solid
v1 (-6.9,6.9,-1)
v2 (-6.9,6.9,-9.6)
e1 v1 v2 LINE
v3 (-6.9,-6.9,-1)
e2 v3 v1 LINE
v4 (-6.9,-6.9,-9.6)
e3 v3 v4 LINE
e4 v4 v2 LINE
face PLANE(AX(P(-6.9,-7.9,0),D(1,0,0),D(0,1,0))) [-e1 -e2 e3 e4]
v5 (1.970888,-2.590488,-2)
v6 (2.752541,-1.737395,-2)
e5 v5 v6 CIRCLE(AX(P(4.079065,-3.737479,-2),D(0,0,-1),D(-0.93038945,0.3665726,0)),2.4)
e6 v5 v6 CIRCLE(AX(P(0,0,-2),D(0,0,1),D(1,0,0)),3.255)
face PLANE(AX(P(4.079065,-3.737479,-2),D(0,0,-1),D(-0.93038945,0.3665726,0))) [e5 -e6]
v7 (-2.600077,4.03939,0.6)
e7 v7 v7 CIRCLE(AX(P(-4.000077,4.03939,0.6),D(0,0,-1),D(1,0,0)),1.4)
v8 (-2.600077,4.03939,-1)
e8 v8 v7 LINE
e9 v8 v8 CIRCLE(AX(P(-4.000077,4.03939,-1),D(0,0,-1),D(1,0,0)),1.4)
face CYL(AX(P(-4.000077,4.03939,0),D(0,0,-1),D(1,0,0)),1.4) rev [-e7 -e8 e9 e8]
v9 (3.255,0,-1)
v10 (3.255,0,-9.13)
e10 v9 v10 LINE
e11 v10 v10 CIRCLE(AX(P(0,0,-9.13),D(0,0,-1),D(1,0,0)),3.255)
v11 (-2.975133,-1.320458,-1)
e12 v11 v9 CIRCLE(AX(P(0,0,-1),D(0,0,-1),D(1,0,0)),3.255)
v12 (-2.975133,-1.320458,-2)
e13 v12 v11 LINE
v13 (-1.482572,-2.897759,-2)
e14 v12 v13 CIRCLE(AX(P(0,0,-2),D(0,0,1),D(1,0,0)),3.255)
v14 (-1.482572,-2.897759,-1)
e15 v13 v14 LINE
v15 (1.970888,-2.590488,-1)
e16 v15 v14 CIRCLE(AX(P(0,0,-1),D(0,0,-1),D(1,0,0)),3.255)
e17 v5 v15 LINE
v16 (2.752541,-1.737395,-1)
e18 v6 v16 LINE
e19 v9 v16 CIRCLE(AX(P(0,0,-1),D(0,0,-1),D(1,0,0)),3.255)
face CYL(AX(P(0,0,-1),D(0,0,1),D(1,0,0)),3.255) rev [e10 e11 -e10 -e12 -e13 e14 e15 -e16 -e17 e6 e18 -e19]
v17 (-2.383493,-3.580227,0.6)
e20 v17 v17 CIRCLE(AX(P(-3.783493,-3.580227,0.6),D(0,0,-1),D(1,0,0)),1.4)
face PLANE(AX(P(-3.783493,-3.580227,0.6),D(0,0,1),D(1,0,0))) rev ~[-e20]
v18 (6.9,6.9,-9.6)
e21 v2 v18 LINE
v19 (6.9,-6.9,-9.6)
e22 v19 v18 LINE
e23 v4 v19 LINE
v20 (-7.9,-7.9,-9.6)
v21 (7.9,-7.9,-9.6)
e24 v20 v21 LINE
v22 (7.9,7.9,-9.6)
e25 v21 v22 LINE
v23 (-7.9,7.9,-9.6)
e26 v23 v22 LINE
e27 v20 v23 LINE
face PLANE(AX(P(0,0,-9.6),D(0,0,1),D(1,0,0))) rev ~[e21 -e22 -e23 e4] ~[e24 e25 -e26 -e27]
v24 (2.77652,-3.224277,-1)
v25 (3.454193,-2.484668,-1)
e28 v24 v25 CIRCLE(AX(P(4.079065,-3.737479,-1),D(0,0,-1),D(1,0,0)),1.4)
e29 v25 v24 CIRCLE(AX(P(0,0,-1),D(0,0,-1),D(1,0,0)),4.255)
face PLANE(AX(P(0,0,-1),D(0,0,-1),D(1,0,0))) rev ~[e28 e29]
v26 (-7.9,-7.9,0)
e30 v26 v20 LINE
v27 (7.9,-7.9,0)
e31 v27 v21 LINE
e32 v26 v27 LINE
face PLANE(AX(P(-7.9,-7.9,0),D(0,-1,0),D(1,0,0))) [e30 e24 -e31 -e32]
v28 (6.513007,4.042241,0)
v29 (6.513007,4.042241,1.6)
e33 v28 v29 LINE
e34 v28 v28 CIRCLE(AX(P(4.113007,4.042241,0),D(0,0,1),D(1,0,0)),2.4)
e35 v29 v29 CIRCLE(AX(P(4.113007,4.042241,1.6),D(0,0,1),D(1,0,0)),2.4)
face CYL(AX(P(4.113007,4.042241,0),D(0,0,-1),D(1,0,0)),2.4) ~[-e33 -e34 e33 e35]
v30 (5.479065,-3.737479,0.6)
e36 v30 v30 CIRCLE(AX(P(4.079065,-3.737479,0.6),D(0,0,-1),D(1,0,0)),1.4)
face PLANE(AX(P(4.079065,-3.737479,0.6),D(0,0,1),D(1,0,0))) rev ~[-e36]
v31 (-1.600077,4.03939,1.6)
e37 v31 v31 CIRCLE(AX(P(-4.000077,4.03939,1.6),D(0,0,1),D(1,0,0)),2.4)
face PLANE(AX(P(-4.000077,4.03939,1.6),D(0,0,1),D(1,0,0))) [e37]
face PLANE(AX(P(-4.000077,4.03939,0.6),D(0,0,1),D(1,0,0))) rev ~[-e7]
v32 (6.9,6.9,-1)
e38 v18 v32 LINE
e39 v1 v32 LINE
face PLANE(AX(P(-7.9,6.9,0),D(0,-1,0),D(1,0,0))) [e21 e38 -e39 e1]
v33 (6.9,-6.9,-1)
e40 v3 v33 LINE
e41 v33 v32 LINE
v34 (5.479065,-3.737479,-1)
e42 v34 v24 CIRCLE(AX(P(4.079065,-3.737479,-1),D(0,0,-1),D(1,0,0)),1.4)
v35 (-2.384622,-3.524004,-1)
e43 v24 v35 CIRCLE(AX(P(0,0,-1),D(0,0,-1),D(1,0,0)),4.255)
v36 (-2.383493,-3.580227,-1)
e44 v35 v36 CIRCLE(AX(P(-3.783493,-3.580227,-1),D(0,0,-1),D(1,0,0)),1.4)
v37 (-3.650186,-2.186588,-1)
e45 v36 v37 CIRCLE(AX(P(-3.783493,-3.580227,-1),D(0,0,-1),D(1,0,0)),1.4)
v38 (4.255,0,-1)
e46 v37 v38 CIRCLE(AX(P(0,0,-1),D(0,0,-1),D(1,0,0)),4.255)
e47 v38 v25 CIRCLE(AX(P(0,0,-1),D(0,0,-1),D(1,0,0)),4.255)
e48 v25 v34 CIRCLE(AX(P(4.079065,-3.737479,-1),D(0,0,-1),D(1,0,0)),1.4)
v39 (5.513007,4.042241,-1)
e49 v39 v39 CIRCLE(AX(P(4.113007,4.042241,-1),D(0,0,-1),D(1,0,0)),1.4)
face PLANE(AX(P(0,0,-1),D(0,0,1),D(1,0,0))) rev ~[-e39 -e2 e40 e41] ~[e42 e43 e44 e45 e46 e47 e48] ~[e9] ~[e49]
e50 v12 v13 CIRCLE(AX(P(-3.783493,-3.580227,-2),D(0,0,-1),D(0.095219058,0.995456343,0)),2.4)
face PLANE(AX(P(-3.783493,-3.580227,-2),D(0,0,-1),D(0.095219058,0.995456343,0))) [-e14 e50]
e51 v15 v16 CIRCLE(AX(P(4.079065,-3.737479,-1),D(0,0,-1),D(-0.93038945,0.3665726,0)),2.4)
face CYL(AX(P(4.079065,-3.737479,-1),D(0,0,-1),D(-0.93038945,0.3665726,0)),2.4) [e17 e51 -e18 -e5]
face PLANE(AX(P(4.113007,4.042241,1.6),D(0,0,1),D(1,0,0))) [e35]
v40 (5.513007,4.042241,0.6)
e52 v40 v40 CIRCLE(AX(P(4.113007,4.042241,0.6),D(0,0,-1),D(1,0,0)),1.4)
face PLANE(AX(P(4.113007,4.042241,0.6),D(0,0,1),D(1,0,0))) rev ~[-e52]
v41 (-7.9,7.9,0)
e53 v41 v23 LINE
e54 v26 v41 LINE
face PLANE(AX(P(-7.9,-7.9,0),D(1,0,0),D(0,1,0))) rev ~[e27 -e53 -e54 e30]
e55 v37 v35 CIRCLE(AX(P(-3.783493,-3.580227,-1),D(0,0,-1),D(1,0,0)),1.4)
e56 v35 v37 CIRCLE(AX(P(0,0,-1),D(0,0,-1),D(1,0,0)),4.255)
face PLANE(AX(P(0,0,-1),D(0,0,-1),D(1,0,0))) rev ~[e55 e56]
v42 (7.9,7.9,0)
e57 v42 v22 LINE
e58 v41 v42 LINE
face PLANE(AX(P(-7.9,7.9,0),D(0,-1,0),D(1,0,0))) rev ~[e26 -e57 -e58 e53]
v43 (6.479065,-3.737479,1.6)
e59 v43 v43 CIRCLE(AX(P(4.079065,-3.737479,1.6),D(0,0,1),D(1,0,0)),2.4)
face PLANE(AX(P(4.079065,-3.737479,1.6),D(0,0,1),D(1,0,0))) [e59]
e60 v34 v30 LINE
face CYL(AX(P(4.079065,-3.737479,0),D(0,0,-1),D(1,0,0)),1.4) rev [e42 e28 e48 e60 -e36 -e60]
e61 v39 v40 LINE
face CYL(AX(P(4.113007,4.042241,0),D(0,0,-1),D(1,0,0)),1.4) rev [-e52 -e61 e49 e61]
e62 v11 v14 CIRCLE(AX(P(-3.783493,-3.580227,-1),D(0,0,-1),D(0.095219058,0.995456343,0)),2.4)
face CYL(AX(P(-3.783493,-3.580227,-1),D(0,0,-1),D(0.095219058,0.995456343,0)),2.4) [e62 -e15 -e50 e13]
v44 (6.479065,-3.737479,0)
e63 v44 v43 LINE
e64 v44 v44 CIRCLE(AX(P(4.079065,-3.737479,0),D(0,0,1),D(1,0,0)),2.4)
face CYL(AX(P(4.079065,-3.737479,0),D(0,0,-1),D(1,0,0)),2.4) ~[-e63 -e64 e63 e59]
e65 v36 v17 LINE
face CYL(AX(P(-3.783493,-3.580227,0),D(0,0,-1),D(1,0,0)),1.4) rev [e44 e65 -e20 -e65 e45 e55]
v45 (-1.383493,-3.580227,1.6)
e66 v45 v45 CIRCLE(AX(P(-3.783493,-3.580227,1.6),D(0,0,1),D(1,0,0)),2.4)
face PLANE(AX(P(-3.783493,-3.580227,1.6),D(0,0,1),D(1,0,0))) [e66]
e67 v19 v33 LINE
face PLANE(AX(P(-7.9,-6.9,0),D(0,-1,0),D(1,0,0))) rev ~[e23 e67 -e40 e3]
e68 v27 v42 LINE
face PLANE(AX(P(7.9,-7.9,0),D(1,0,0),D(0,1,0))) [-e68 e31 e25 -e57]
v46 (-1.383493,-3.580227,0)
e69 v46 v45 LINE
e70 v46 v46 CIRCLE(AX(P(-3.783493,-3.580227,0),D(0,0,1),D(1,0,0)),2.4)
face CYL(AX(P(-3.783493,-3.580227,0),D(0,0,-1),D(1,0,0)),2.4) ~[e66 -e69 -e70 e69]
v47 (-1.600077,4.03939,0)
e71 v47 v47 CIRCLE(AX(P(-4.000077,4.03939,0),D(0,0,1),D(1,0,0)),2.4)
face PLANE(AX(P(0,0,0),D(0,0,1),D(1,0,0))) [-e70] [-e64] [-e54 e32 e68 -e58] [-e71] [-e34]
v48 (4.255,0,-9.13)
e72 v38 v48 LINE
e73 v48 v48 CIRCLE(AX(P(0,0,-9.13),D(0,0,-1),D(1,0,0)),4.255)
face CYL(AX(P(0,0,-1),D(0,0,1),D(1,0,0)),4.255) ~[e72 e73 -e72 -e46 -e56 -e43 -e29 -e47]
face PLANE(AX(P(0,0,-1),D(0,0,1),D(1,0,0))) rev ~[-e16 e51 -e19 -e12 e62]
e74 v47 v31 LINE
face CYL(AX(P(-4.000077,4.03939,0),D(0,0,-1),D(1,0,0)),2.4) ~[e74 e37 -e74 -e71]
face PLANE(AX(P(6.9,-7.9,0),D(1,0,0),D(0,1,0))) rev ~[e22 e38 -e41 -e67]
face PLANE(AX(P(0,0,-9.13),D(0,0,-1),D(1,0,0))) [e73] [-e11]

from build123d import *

# Parameters (mm, degrees)
F0_W          = 15.8
F0_H          = 15.8
F1_DEPTH      = 9.6
F4_R          = 2.4
F6_DEPTH      = 1.6
F5_R          = 2.4
F7_DEPTH      = 1.6
F3_R          = 2.4
F8_DEPTH      = 1.6
F2_R          = 2.4
F9_DEPTH      = 1.6
F10_T         = -1
F11_R         = 4.255
F12_DEPTH     = 8.13
F13_T         = 1
F13_T3_DEPTH  = 10.6
F13_T5_DEPTH  = 15.8
F13_T7_DEPTH  = 15.8
F13_T18_ANGLE = 35.7281901551
F13_T20_ANGLE = 210.9230732258
F13_T22_ANGLE = 74.818128958
F13_T24_ANGLE = 41.9866867229
F13_T28_ANGLE = 82.2344866513


# Not quite as in the source:
# - a shell that OpenCascade refuses in one call is made with other operations: the cavity is built on its own and cut out


with BuildPart() as f1:
    # F0 (on Top) → F1 (new body)
    with BuildSketch(Plane.XY):
        Rectangle(F0_W, F0_H)
    extrude(amount=-F1_DEPTH)

    # F4 (on face) → F6 (join)
    with BuildSketch(Plane.XY):
        with Locations((-3.7834926043, -3.5802270286)):
            Circle(F4_R)
    extrude(amount=F6_DEPTH)

    # F5 (on face) → F7 (join)
    with BuildSketch(Plane.XY):
        with Locations((4.0790652856, -3.737478517)):
            Circle(F5_R)
    extrude(amount=F7_DEPTH)

    # F3 (on face) → F8 (join)
    with BuildSketch(Plane.XY):
        with Locations((4.1130073369, 4.042240791)):
            Circle(F3_R)
    extrude(amount=F8_DEPTH)

    # F2 (on face) + F3 (on face) → F9 (join)
    with BuildSketch(Plane.XY):
        with Locations((-4.0000770241, 4.039389547)):
            Circle(F2_R)
    with BuildSketch(Plane.XY):
        with Locations((4.1130073369, 4.042240791)):
            Circle(F3_R)
    extrude(amount=F9_DEPTH)

    # F10
    f10_openings = [f1.faces().sort_by_distance(p)[0] for p in [
        (0, 0, -9.6),
    ]]
    offset(amount=F10_T, openings=f10_openings, kind=Kind.INTERSECTION)

    # F11 (on face) → F12 (join)
    with BuildSketch(Plane(origin=(0, 0, -1), x_dir=(1, 0, 0), z_dir=(0, 0, -1))):
        Circle(F11_R)
    extrude(amount=F12_DEPTH)

    # F13: shell of thickness 1, made by hand


with BuildPart() as f13_core1:
    # F13_t2: copy of F1
    add(f1.part)

    # the walls: a layer under each face that stays
    f13_faces = [f13_core1.faces().sort_by_distance(p)[0] for p in [
        (7.9, 0, -4.8),
        (0, -7.9, -4.8),
        (0, 7.9, -4.8),
        (0, 0, 0),
        (-7.3733333333, -7.3733333333, -9.6),
        (-7.9, 0, -4.8),
        (-6.1834926043, -3.5802270286, 0.8),
        (1.6790652856, -3.737478517, 0.8),
        (-6.4000770241, 4.039389547, 0.8),
        (1.7130073369, 4.042240791, 0.8),
        (6.9, 0, -5.3),
        (0, -6.9, -5.3),
        (-6.9, 0, -5.3),
        (0, 6.9, -5.3),
        (-3.7834926043, -3.5802270286, 1.6),
        (4.0790652856, -3.737478517, 1.6),
        (-4.0000770241, 4.039389547, 1.6),
        (4.1130073369, 4.042240791, 1.6),
        (-4.6, 0, -1),
        (2.6790652856, -3.737478517, -0.2),
        (-4.255, 0, -5.065),
        (-5.1834926043, -3.5802270286, -0.2),
        (-5.4000770241, 4.039389547, -0.2),
        (2.7130073369, 4.042240791, -0.2),
        (3.1153566982, -2.8544722668, -1),
        (4.0790652856, -3.737478517, 0.6),
        (-3.0174039644, -2.8552959816, -1),
        (-3.7834926043, -3.5802270286, 0.6),
        (-4.0000770241, 4.039389547, 0.6),
        (4.1130073369, 4.042240791, 0.6),
    ]]
    thicken(f13_faces, amount=-F13_T, mode=Mode.SUBTRACT)

    # F13_s4 → F13_t3 (cut)
    with BuildSketch(Plane.XY.offset(-10.6)):
        Polygon((6.89, -6.89), (7.9, -6.9), (7.9, -7.9), (6.9, -7.9), align=None)
        Polygon((6.89, 6.89), (7.9, 6.9), (7.9, 7.9), (6.9, 7.9), align=None)
        Polygon((-6.89, -6.89), (-6.9, -7.9), (-7.9, -7.9), (-7.9, -6.9), align=None)
        Polygon((-6.89, 6.89), (-7.9, 6.9), (-7.9, 7.9), (-6.9, 7.9), align=None)
    extrude(amount=F13_T3_DEPTH, mode=Mode.SUBTRACT)

    # F13_s6 → F13_t5 (cut)
    with BuildSketch(Plane.XZ.offset(-7.9)):
        Polygon((6.89, -1.01), (7.9, -1), (7.9, 0), (6.9, 0), align=None)
        Polygon((-6.89, -1.01), (-7.9, -1), (-7.9, 0), (-6.9, 0), align=None)
    extrude(amount=F13_T5_DEPTH, mode=Mode.SUBTRACT)

    # F13_s8 → F13_t7 (cut)
    with BuildSketch(Plane.YZ.offset(-7.9)):
        Polygon((-6.89, -1.01), (-7.9, -1), (-7.9, 0), (-6.9, 0), align=None)
        Polygon((6.89, -1.01), (7.9, -1), (7.9, 0), (6.9, 0), align=None)
    extrude(amount=F13_T7_DEPTH, mode=Mode.SUBTRACT)

    # F13_s9 → F13_t10 (revolve, cut)
    with BuildSketch(Plane.XZ.offset(3.5802270286)):
        Polygon((-1.3734926043, 0.01), (-1.3834926043, -1), (-2.3834926043, -1), (-2.3834926043, 0), align=None)
    revolve(axis=Axis((-3.7834926043, -3.5802270286, 0), (0, 0, 1)), mode=Mode.SUBTRACT)

    # F13_s11 → F13_t12 (revolve, cut)
    with BuildSketch(Plane.XZ.offset(3.737478517)):
        Polygon((6.4890652856, 0.01), (6.4790652856, -1), (5.4790652856, -1), (5.4790652856, 0), align=None)
    revolve(axis=Axis((4.0790652856, -3.737478517, 0), (0, 0, 1)), mode=Mode.SUBTRACT)

    # F13_s13 → F13_t14 (revolve, cut)
    with BuildSketch(Plane.XZ.offset(-4.039389547)):
        Polygon((-1.5900770241, 0.01), (-1.6000770241, -1), (-2.6000770241, -1), (-2.6000770241, 0), align=None)
    revolve(axis=Axis((-4.0000770241, 4.039389547, 0), (0, 0, 1)), mode=Mode.SUBTRACT)

    # F13_s15 → F13_t16 (revolve, cut)
    with BuildSketch(Plane.XZ.offset(-4.042240791)):
        Polygon((6.5230073369, 0.01), (6.5130073369, -1), (5.5130073369, -1), (5.5130073369, 0), align=None)
    revolve(axis=Axis((4.1130073369, 4.042240791, 0), (0, 0, 1)), mode=Mode.SUBTRACT)

    # F13_s17 → F13_t18 (revolve, cut)
    with BuildSketch(Plane.XZ):
        Polygon((4.265, -1.01), (4.255, 0), (3.255, 0), (3.255, -1), align=None)
    revolve(axis=Axis((0, 0, -1), (0, 0, -1)), revolution_arc=F13_T18_ANGLE, mode=Mode.SUBTRACT)

    # F13_s19 → F13_t20 (revolve, cut)
    with BuildSketch(Plane(origin=(0, 0, 0), x_dir=(0, 0, 1), z_dir=(0.5138867564, -0.8578580312, 0))):
        Polygon((-1.01, 4.265), (0, 4.255), (0, 3.255), (-1, 3.255), align=None)
    revolve(axis=Axis((0, 0, -1), (0, 0, -1)), revolution_arc=F13_T20_ANGLE, mode=Mode.SUBTRACT)

    # F13_s21 → F13_t22 (revolve, cut)
    with BuildSketch(Plane(origin=(0, 0, 0), x_dir=(0, 0, 1), z_dir=(0.7577618984, 0.6525311528, 0))):
        Polygon((-1.01, 4.265), (0, 4.255), (0, 3.255), (-1, 3.255), align=None)
    revolve(axis=Axis((0, 0, -1), (0, 0, -1)), revolution_arc=F13_T22_ANGLE, mode=Mode.SUBTRACT)

    # F13_s23 → F13_t24 (revolve, cut)
    with BuildSketch(Plane(origin=(-0.7265604619, -1.8440663308, 0), x_dir=(0, 0, 1), z_dir=(-0.3665725996, -0.9303894503, 0))):
        Polygon((-0.99, -3.7751765248), (-1, -2.7651765248), (-2, -2.7651765248), (-2, -3.7651765248), align=None)
    revolve(axis=Axis((4.0790652856, -3.737478517, -1), (0, 0, -1)), revolution_arc=F13_T24_ANGLE, mode=Mode.SUBTRACT)

    # F13_s25 → F13_t26 (revolve, cut)
    with BuildSketch(Plane.XZ.offset(3.737478517)):
        Polygon((5.4690652856, 0.59), (6.4790652856, 0.6), (6.4790652856, 1.6), (5.4790652856, 1.6), align=None)
    revolve(axis=Axis((4.0790652856, -3.737478517, 0.6), (0, 0, -1)), mode=Mode.SUBTRACT)

    # F13_s27 → F13_t28 (revolve, cut)
    with BuildSketch(Plane(origin=(-3.4098320419, 0.3261629687, 0), x_dir=(0, 0, 1), z_dir=(-0.9954563431, 0.0952190583, 0))):
        Polygon((-0.99, -2.5342203081), (-1, -1.5242203081), (-2, -1.5242203081), (-2, -2.5242203081), align=None)
    revolve(axis=Axis((-3.7834926043, -3.5802270286, -1), (0, 0, -1)), revolution_arc=F13_T28_ANGLE, mode=Mode.SUBTRACT)

    # F13_s29 → F13_t30 (revolve, cut)
    with BuildSketch(Plane.XZ.offset(3.5802270286)):
        Polygon((-2.3934926043, 0.59), (-1.3834926043, 0.6), (-1.3834926043, 1.6), (-2.3834926043, 1.6), align=None)
    revolve(axis=Axis((-3.7834926043, -3.5802270286, 0.6), (0, 0, -1)), mode=Mode.SUBTRACT)

    # F13_s31 → F13_t32 (revolve, cut)
    with BuildSketch(Plane.XZ.offset(-4.039389547)):
        Polygon((-2.6100770241, 0.59), (-1.6000770241, 0.6), (-1.6000770241, 1.6), (-2.6000770241, 1.6), align=None)
    revolve(axis=Axis((-4.0000770241, 4.039389547, 0.6), (0, 0, -1)), mode=Mode.SUBTRACT)

    # F13_s33 → F13_t34 (revolve, cut)
    with BuildSketch(Plane.XZ.offset(-4.042240791)):
        Polygon((5.5030073369, 0.59), (6.5130073369, 0.6), (6.5130073369, 1.6), (5.5130073369, 1.6), align=None)
    revolve(axis=Axis((4.1130073369, 4.042240791, 0.6), (0, 0, -1)), mode=Mode.SUBTRACT)


with BuildPart() as f1_1:
    add(f1.part)

    # what is left inside the walls is the cavity
    f13_cavity = [f13_core1.part.solids().sort_by_distance(p)[0] for p in [
        (-3.245, 0, -6.42),
    ]]
    add(f13_cavity, mode=Mode.SUBTRACT)


solid = f1_1.part
